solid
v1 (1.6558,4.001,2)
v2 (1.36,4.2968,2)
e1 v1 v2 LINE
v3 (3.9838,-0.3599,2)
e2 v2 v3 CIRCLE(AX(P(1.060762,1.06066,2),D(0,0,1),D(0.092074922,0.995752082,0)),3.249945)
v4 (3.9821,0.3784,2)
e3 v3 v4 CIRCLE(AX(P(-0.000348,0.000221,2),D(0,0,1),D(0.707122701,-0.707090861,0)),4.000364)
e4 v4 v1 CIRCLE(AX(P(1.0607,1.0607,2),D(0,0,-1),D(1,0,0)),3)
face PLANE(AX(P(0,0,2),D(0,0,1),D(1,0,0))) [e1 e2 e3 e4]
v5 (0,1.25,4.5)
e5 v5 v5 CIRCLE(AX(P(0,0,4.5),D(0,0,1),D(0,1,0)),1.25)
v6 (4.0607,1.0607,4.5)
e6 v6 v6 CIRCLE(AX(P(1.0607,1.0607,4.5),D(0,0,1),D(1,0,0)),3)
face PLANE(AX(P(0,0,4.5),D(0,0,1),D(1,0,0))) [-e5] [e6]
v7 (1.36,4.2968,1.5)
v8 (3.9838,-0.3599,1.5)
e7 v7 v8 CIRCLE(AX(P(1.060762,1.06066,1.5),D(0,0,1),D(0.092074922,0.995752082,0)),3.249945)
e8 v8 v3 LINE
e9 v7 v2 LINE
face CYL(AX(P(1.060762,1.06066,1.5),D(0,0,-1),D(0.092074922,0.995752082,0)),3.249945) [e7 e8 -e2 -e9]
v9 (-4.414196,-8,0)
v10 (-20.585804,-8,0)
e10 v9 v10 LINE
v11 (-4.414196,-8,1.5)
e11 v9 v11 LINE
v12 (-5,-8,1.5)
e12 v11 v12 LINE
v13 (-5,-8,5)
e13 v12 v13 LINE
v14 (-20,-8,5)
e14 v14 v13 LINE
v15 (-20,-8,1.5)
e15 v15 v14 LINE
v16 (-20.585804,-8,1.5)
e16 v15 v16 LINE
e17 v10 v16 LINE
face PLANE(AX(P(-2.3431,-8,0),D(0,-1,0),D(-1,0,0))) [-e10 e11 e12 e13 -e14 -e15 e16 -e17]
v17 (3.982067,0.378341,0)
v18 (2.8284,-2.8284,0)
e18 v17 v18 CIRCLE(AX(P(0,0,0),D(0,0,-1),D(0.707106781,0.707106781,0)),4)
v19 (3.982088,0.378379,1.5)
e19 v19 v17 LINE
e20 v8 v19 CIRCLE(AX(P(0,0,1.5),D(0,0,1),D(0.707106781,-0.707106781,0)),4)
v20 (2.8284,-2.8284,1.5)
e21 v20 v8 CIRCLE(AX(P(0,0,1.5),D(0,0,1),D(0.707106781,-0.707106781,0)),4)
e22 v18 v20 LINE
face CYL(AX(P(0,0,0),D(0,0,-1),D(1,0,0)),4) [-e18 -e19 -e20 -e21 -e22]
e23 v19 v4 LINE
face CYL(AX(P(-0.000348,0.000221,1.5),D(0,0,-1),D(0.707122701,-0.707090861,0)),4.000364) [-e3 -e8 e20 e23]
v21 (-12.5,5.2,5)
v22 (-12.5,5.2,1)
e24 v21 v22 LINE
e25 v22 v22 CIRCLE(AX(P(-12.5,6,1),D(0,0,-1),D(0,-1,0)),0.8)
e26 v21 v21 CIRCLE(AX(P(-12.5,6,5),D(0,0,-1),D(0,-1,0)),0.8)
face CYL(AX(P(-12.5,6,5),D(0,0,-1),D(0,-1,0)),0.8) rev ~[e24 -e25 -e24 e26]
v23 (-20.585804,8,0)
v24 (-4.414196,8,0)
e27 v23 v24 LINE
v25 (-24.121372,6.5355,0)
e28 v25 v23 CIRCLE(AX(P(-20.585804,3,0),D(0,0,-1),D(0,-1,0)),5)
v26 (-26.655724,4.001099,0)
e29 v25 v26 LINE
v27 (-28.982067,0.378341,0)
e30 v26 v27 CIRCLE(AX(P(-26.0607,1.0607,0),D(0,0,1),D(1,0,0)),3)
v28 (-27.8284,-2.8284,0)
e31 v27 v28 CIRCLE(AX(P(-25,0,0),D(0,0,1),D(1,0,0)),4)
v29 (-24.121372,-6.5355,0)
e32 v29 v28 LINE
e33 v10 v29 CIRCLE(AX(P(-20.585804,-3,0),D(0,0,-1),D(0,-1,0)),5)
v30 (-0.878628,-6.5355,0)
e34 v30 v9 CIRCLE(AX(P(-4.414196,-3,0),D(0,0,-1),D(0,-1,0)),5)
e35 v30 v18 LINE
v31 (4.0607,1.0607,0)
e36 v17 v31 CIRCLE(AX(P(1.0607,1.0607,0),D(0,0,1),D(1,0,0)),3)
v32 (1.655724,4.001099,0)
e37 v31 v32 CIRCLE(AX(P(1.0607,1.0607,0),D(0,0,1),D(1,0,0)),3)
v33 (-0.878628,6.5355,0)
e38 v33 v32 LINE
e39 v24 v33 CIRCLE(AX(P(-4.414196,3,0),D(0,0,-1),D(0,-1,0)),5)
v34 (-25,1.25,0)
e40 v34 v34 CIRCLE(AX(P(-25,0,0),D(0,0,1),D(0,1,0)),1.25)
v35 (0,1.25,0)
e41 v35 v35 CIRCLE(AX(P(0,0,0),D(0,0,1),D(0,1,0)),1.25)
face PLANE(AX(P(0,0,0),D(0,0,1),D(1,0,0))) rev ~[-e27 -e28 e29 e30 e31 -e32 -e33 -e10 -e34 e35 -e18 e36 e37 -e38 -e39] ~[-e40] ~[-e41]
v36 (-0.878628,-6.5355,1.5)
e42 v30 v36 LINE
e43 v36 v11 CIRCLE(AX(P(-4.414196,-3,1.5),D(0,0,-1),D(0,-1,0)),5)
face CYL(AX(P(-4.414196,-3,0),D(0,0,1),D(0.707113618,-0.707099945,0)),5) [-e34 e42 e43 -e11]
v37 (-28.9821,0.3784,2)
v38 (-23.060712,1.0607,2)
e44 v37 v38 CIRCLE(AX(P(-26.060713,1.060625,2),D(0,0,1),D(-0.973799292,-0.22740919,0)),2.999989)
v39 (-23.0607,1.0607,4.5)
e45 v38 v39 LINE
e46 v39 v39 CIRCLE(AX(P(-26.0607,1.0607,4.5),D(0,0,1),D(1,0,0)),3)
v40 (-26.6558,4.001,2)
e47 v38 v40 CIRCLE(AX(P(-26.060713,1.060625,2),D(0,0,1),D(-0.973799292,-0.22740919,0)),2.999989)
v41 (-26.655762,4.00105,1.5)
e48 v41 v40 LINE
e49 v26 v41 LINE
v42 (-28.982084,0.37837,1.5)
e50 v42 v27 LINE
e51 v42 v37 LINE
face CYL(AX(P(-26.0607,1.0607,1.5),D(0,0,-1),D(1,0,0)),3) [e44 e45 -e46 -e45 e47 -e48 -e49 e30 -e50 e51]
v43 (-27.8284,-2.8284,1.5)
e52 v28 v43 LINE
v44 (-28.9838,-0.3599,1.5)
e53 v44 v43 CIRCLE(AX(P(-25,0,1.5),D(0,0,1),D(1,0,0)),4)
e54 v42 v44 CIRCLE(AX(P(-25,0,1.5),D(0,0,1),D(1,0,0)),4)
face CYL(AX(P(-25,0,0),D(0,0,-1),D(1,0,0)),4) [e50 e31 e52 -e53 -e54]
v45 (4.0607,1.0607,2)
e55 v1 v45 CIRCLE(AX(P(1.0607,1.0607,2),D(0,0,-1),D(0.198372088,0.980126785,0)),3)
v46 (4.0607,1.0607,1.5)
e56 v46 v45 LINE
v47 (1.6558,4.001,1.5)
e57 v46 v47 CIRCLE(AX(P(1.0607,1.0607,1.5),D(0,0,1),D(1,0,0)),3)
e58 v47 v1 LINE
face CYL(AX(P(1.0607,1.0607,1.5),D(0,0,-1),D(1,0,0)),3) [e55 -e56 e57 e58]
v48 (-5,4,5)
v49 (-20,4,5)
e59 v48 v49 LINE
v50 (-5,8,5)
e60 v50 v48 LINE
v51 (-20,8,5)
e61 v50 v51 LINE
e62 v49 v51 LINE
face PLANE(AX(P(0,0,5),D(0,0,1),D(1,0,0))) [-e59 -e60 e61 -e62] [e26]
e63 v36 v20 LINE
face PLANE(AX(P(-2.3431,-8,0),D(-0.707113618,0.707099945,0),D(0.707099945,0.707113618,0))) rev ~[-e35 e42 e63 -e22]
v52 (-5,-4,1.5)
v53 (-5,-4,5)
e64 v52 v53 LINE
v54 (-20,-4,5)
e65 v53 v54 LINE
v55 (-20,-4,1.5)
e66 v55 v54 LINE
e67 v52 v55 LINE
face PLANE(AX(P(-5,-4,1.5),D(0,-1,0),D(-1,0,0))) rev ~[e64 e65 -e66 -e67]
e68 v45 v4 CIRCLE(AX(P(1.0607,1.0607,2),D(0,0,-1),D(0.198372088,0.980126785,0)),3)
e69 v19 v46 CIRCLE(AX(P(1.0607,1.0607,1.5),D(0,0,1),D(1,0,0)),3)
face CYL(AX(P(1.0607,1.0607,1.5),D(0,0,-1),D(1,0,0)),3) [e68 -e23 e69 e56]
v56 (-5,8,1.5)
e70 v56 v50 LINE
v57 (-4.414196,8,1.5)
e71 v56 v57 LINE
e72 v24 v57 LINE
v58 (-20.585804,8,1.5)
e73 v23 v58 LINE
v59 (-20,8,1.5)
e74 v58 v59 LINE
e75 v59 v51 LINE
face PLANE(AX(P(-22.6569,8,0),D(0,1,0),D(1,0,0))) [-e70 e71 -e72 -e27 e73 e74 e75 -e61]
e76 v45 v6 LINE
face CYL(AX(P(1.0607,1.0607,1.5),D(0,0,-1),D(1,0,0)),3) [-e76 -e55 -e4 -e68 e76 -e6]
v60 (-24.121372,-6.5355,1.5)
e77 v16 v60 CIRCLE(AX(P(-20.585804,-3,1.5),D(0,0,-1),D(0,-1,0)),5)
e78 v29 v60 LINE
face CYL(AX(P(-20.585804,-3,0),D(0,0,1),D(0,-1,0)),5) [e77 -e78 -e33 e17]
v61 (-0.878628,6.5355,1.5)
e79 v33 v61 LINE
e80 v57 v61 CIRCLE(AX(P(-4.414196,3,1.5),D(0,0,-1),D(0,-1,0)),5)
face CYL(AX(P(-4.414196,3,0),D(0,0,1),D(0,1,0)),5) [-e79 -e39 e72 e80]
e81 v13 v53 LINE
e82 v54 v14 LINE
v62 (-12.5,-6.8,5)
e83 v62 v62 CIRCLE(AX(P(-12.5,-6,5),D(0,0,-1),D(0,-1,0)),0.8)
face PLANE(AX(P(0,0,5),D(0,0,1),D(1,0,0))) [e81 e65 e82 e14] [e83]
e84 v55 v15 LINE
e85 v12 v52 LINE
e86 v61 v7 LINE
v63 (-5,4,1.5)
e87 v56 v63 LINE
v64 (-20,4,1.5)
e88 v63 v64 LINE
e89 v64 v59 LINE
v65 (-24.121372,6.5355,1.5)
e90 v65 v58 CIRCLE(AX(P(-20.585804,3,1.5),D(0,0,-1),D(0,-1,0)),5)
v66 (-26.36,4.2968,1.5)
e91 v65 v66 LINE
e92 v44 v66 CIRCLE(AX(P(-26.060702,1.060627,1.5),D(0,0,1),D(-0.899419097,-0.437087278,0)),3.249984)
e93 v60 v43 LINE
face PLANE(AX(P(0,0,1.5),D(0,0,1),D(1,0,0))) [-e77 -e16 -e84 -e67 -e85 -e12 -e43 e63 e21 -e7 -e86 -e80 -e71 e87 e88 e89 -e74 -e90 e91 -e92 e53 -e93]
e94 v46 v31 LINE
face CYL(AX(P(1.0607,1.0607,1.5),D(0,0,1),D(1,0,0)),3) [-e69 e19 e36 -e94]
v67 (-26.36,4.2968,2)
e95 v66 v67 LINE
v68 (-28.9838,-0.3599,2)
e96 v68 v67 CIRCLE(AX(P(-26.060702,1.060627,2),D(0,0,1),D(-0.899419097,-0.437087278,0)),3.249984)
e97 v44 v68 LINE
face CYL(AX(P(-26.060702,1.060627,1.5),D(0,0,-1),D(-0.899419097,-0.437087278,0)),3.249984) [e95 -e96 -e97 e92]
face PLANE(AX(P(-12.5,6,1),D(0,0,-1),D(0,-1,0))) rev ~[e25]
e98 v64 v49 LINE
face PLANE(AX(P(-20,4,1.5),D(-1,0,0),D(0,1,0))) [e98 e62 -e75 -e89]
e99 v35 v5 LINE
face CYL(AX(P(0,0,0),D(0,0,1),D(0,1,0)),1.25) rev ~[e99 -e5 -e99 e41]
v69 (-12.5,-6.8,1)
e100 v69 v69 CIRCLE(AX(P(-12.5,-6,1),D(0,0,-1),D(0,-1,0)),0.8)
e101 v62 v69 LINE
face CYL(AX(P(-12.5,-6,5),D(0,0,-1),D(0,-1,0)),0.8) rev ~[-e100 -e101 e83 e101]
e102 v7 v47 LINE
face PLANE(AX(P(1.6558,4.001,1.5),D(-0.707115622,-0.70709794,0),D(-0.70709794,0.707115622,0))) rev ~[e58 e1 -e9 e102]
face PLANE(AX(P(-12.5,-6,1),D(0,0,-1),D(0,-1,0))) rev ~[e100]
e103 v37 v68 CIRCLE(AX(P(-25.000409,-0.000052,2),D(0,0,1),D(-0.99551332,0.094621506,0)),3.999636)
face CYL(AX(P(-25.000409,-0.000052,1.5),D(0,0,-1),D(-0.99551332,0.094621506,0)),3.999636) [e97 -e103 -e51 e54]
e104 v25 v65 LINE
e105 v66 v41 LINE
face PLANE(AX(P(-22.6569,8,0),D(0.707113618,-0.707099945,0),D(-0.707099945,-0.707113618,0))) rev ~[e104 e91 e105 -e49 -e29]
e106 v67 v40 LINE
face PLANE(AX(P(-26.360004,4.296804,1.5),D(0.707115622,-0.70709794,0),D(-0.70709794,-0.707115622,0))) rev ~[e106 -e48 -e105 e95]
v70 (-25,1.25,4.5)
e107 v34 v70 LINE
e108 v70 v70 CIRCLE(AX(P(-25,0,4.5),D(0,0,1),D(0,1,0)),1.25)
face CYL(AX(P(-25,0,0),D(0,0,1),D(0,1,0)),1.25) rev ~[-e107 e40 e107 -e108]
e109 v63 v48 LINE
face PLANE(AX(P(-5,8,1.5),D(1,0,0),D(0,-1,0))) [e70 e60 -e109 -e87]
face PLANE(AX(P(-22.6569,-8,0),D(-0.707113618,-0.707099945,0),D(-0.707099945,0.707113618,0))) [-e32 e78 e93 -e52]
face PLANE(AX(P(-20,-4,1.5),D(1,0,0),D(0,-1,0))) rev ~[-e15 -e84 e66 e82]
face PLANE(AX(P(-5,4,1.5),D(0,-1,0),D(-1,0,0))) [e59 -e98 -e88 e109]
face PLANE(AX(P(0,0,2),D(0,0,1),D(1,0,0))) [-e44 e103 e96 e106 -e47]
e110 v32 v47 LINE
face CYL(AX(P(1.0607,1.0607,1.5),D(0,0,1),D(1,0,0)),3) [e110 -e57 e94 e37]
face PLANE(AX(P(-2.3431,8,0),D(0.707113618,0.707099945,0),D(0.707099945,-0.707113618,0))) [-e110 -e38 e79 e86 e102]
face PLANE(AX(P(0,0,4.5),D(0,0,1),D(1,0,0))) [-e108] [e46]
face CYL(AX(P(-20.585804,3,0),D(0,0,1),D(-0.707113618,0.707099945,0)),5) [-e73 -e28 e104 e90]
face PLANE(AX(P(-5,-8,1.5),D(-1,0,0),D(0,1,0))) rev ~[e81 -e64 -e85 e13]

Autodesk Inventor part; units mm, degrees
ref_plane "YZ Plane" through (0, 0, 0) normal (1, 0, 0) x (0, 1, 0)
ref_plane "XZ Plane" through (0, 0, 0) normal (0, 1, 0) x (-1, 0, 0)
ref_plane "XY Plane" through (0, 0, 0) normal (0, 0, 1) x (1, 0, 0)
sketch "axes" plane through (0, 0, 0) normal (0, 0, 1) x (1, 0, 0)
  point P0 (0, 0)
  point P1 (0, 0)
  point P2 (-25, 0)
  dimension "d0" = 25
sketch "Sketch2" plane through (0, 0, 0) normal (0, 0, 1) x (1, 0, 0)
  circle A0 centre (-25, 0) radius 4
  circle A1 centre (0, 0) radius 4
  line L0 (-22.6569, 8) -> (-2.3431, 8)
  line L1 (-2.3431, -8) -> (-22.6569, -8)
  line L2 (-22.6569, -8) -> (-27.8284, -2.8284)
  line L3 (-22.6569, 8) -> (-27.8284, 2.8284)
  line L4 (-2.3431, 8) -> (2.8284, 2.8284)
  line L5 (-2.3431, -8) -> (2.8284, -2.8284)
  line L6 (-25, 0) -> (0, 0) construction
  dimension "d1" = 8
  dimension "d2" = 8
  dimension "d3" = 16
  dimension "d4" = 45
  dimension "d5" = 45
extrude "baseplate" add sketch "Sketch2" along normal blind 1.5
sketch "Sketch3" plane through (0, 0, 1.5) normal (0, 0, 1) x (1, 0, 0)
  arc A0 (-27.8284, 2.8284) -> (-27.8284, -2.8284) centre (-25, 0) ccw projected
  line L0 (-27.8284, -2.8284) -> (-22.6569, -8) projected
  line L1 (-22.6569, -8) -> (-2.3431, -8) projected
  line L2 (-2.3431, -8) -> (2.8284, -2.8284) projected
  arc A1 (2.8284, -2.8284) -> (2.8284, 2.8284) centre (0, 0) ccw projected
  line L3 (2.8284, 2.8284) -> (-2.3431, 8) projected
  line L4 (-2.3431, 8) -> (-22.6569, 8) projected
  line L5 (-22.6569, 8) -> (-27.8284, 2.8284) projected
  line L6 (-20, 8) -> (-5, 8)
  line L7 (-5, 8) -> (-5, 4)
  line L8 (-5, 4) -> (-20, 4)
  line L9 (-20, 4) -> (-20, 8)
  line L10 (-20, -8) -> (-5, -8)
  line L11 (-5, -8) -> (-5, -4)
  line L12 (-5, -4) -> (-20, -4)
  line L13 (-20, -4) -> (-20, -8)
  dimension "d8" = 4
  dimension "d9" = 4
  dimension "d10" = 5
  dimension "d11" = 5
  dimension "d12" = 5
  dimension "d13" = 5
extrude "walls" add sketch "Sketch3" along normal blind 3.5 contours L4 L7 L8 L9 | L13 L12 L11 L1
sketch "Sketch5" plane through (0, 0, 5) normal (0, 0, 1) x (1, 0, 0)
  line L0 (-20, -8) -> (-5, -8) projected
  line L1 (-5, -8) -> (-5, -4) projected
  line L2 (-5, -4) -> (-20, -4) projected
  line L3 (-20, -4) -> (-20, -8) projected
  line L4 (-20, 8) -> (-20, 4) projected
  line L5 (-20, 4) -> (-5, 4) projected
  line L6 (-5, 4) -> (-5, 8) projected
  line L7 (-5, 8) -> (-20, 8) projected
  line L8 (-5, -6) -> (-20, -6) construction
  line L9 (-5, 6) -> (-20, 6) construction
  point P0 (0, 0)
  point P1 (-12.5, -6)
  point P2 (-12.5, 6)
hole "mounting" at (-12.5, -6, 5) at (-12.5, 6, 5) direction (0, 0, -1) diameter 1.6 depth 4
sketch "Sketch6" plane through (0, 0, 1.5) normal (0, 0, 1) x (1, 0, 0)
  circle A0 centre (1.0607, 1.0607) radius 3
  line L0 (0, 0) -> (1.0607, 1.0607) construction
  line L1 (0, 0) -> (7.1773, 0) construction
  dimension "d30" = 45
  dimension "d31" = 1.5
  dimension "d32" = 6
extrude "pip springy" add sketch "Sketch6" along normal blind 3 and the other way blind 1.5
sketch "Sketch10" plane through (0, 0, 1.5) normal (0, 0, 1) x (1, 0, 0)
  circle A0 centre (1.0607, 1.0607) radius 3 projected
  line L0 (1.6558, 4.001) -> (-2.3431, 8) projected
  arc A1 (2.8284, -2.8284) -> (3.9821, 0.3784) centre (0, 0) ccw projected
  arc A2 (1.36, 4.2968) -> (3.9838, -0.3599) centre (1.0607, 1.0607) ccw
  dimension "d50" = 6.5
extrude "Extrusion7" add sketch "Sketch10" along normal blind 0.5
sketch "Sketch8" plane through (0, 0, 1.5) normal (0, 0, 1) x (1, 0, 0)
  line L0 (-30.1045, 0) -> (-25, 0) construction
  line L1 (-25, 0) -> (-29.2709, 4.2709) construction
  circle A0 centre (-26.0607, 1.0607) radius 3
  point P0 (0, 0)
  dimension "d38" = 45
  dimension "d39" = 6
  dimension "d40" = 1.5
extrude "dip springy" add sketch "Sketch8" along normal blind 3 and the other way blind 1.5
sketch "Sketch9" plane through (0, 0, 1.5) normal (0, 0, 1) x (1, 0, 0)
  arc A0 (-28.9821, 0.3784) -> (-26.6558, 4.001) centre (-26.0607, 1.0607) ccw projected
  arc A1 (-28.9838, -0.3599) -> (-26.36, 4.2968) centre (-26.0607, 1.0607) ccw
  line L0 (-22.6569, 8) -> (-26.6558, 4.001) projected
  arc A2 (-28.9821, 0.3784) -> (-27.8284, -2.8284) centre (-25, 0) ccw projected
  point P0 (0, 0)
  dimension "d43" = 6.5
extrude "Extrusion6" add sketch "Sketch9" along normal blind 0.5
sketch "Sketch4" plane through (0, 0, 0) normal (0, 0, -1) x (-1, 0, 0)
  point P0 (25, 0)
  point P1 (0, 0)
hole "joints" at (0, 0, 0) at (-25, 0, 0) direction (0, 0, 1) diameter 2.5 end through all
fillet "Fillet1" radius 5 4 edges at (-2.3431, -8, 0.75) (-22.6569, -8, 0.75) (-22.6569, 8, 0.75) (-2.3431, 8, 0.75)
equation "\"d0\" = PIP_DIP_length"
equation "\"d31\" = PIP_spring_arm"
equation "\"d40\" = DIP_spring_arm"
equation "\"PIP_DIP_length\" = F4_PIP_DIP_length"
equation "\"PIP_spring_arm\" = F4_PIP_spring_arm"
equation "\"DIP_spring_arm\" = F4_DIP_spring_arm"
equation "\"F4_PIP_DIP_length\" = 25"
equation "\"F4_PIP_spring_arm\" = 1.5"
equation "\"F4_DIP_spring_arm\" = 1.5"
properties part number "phalanx 2 R F4"
